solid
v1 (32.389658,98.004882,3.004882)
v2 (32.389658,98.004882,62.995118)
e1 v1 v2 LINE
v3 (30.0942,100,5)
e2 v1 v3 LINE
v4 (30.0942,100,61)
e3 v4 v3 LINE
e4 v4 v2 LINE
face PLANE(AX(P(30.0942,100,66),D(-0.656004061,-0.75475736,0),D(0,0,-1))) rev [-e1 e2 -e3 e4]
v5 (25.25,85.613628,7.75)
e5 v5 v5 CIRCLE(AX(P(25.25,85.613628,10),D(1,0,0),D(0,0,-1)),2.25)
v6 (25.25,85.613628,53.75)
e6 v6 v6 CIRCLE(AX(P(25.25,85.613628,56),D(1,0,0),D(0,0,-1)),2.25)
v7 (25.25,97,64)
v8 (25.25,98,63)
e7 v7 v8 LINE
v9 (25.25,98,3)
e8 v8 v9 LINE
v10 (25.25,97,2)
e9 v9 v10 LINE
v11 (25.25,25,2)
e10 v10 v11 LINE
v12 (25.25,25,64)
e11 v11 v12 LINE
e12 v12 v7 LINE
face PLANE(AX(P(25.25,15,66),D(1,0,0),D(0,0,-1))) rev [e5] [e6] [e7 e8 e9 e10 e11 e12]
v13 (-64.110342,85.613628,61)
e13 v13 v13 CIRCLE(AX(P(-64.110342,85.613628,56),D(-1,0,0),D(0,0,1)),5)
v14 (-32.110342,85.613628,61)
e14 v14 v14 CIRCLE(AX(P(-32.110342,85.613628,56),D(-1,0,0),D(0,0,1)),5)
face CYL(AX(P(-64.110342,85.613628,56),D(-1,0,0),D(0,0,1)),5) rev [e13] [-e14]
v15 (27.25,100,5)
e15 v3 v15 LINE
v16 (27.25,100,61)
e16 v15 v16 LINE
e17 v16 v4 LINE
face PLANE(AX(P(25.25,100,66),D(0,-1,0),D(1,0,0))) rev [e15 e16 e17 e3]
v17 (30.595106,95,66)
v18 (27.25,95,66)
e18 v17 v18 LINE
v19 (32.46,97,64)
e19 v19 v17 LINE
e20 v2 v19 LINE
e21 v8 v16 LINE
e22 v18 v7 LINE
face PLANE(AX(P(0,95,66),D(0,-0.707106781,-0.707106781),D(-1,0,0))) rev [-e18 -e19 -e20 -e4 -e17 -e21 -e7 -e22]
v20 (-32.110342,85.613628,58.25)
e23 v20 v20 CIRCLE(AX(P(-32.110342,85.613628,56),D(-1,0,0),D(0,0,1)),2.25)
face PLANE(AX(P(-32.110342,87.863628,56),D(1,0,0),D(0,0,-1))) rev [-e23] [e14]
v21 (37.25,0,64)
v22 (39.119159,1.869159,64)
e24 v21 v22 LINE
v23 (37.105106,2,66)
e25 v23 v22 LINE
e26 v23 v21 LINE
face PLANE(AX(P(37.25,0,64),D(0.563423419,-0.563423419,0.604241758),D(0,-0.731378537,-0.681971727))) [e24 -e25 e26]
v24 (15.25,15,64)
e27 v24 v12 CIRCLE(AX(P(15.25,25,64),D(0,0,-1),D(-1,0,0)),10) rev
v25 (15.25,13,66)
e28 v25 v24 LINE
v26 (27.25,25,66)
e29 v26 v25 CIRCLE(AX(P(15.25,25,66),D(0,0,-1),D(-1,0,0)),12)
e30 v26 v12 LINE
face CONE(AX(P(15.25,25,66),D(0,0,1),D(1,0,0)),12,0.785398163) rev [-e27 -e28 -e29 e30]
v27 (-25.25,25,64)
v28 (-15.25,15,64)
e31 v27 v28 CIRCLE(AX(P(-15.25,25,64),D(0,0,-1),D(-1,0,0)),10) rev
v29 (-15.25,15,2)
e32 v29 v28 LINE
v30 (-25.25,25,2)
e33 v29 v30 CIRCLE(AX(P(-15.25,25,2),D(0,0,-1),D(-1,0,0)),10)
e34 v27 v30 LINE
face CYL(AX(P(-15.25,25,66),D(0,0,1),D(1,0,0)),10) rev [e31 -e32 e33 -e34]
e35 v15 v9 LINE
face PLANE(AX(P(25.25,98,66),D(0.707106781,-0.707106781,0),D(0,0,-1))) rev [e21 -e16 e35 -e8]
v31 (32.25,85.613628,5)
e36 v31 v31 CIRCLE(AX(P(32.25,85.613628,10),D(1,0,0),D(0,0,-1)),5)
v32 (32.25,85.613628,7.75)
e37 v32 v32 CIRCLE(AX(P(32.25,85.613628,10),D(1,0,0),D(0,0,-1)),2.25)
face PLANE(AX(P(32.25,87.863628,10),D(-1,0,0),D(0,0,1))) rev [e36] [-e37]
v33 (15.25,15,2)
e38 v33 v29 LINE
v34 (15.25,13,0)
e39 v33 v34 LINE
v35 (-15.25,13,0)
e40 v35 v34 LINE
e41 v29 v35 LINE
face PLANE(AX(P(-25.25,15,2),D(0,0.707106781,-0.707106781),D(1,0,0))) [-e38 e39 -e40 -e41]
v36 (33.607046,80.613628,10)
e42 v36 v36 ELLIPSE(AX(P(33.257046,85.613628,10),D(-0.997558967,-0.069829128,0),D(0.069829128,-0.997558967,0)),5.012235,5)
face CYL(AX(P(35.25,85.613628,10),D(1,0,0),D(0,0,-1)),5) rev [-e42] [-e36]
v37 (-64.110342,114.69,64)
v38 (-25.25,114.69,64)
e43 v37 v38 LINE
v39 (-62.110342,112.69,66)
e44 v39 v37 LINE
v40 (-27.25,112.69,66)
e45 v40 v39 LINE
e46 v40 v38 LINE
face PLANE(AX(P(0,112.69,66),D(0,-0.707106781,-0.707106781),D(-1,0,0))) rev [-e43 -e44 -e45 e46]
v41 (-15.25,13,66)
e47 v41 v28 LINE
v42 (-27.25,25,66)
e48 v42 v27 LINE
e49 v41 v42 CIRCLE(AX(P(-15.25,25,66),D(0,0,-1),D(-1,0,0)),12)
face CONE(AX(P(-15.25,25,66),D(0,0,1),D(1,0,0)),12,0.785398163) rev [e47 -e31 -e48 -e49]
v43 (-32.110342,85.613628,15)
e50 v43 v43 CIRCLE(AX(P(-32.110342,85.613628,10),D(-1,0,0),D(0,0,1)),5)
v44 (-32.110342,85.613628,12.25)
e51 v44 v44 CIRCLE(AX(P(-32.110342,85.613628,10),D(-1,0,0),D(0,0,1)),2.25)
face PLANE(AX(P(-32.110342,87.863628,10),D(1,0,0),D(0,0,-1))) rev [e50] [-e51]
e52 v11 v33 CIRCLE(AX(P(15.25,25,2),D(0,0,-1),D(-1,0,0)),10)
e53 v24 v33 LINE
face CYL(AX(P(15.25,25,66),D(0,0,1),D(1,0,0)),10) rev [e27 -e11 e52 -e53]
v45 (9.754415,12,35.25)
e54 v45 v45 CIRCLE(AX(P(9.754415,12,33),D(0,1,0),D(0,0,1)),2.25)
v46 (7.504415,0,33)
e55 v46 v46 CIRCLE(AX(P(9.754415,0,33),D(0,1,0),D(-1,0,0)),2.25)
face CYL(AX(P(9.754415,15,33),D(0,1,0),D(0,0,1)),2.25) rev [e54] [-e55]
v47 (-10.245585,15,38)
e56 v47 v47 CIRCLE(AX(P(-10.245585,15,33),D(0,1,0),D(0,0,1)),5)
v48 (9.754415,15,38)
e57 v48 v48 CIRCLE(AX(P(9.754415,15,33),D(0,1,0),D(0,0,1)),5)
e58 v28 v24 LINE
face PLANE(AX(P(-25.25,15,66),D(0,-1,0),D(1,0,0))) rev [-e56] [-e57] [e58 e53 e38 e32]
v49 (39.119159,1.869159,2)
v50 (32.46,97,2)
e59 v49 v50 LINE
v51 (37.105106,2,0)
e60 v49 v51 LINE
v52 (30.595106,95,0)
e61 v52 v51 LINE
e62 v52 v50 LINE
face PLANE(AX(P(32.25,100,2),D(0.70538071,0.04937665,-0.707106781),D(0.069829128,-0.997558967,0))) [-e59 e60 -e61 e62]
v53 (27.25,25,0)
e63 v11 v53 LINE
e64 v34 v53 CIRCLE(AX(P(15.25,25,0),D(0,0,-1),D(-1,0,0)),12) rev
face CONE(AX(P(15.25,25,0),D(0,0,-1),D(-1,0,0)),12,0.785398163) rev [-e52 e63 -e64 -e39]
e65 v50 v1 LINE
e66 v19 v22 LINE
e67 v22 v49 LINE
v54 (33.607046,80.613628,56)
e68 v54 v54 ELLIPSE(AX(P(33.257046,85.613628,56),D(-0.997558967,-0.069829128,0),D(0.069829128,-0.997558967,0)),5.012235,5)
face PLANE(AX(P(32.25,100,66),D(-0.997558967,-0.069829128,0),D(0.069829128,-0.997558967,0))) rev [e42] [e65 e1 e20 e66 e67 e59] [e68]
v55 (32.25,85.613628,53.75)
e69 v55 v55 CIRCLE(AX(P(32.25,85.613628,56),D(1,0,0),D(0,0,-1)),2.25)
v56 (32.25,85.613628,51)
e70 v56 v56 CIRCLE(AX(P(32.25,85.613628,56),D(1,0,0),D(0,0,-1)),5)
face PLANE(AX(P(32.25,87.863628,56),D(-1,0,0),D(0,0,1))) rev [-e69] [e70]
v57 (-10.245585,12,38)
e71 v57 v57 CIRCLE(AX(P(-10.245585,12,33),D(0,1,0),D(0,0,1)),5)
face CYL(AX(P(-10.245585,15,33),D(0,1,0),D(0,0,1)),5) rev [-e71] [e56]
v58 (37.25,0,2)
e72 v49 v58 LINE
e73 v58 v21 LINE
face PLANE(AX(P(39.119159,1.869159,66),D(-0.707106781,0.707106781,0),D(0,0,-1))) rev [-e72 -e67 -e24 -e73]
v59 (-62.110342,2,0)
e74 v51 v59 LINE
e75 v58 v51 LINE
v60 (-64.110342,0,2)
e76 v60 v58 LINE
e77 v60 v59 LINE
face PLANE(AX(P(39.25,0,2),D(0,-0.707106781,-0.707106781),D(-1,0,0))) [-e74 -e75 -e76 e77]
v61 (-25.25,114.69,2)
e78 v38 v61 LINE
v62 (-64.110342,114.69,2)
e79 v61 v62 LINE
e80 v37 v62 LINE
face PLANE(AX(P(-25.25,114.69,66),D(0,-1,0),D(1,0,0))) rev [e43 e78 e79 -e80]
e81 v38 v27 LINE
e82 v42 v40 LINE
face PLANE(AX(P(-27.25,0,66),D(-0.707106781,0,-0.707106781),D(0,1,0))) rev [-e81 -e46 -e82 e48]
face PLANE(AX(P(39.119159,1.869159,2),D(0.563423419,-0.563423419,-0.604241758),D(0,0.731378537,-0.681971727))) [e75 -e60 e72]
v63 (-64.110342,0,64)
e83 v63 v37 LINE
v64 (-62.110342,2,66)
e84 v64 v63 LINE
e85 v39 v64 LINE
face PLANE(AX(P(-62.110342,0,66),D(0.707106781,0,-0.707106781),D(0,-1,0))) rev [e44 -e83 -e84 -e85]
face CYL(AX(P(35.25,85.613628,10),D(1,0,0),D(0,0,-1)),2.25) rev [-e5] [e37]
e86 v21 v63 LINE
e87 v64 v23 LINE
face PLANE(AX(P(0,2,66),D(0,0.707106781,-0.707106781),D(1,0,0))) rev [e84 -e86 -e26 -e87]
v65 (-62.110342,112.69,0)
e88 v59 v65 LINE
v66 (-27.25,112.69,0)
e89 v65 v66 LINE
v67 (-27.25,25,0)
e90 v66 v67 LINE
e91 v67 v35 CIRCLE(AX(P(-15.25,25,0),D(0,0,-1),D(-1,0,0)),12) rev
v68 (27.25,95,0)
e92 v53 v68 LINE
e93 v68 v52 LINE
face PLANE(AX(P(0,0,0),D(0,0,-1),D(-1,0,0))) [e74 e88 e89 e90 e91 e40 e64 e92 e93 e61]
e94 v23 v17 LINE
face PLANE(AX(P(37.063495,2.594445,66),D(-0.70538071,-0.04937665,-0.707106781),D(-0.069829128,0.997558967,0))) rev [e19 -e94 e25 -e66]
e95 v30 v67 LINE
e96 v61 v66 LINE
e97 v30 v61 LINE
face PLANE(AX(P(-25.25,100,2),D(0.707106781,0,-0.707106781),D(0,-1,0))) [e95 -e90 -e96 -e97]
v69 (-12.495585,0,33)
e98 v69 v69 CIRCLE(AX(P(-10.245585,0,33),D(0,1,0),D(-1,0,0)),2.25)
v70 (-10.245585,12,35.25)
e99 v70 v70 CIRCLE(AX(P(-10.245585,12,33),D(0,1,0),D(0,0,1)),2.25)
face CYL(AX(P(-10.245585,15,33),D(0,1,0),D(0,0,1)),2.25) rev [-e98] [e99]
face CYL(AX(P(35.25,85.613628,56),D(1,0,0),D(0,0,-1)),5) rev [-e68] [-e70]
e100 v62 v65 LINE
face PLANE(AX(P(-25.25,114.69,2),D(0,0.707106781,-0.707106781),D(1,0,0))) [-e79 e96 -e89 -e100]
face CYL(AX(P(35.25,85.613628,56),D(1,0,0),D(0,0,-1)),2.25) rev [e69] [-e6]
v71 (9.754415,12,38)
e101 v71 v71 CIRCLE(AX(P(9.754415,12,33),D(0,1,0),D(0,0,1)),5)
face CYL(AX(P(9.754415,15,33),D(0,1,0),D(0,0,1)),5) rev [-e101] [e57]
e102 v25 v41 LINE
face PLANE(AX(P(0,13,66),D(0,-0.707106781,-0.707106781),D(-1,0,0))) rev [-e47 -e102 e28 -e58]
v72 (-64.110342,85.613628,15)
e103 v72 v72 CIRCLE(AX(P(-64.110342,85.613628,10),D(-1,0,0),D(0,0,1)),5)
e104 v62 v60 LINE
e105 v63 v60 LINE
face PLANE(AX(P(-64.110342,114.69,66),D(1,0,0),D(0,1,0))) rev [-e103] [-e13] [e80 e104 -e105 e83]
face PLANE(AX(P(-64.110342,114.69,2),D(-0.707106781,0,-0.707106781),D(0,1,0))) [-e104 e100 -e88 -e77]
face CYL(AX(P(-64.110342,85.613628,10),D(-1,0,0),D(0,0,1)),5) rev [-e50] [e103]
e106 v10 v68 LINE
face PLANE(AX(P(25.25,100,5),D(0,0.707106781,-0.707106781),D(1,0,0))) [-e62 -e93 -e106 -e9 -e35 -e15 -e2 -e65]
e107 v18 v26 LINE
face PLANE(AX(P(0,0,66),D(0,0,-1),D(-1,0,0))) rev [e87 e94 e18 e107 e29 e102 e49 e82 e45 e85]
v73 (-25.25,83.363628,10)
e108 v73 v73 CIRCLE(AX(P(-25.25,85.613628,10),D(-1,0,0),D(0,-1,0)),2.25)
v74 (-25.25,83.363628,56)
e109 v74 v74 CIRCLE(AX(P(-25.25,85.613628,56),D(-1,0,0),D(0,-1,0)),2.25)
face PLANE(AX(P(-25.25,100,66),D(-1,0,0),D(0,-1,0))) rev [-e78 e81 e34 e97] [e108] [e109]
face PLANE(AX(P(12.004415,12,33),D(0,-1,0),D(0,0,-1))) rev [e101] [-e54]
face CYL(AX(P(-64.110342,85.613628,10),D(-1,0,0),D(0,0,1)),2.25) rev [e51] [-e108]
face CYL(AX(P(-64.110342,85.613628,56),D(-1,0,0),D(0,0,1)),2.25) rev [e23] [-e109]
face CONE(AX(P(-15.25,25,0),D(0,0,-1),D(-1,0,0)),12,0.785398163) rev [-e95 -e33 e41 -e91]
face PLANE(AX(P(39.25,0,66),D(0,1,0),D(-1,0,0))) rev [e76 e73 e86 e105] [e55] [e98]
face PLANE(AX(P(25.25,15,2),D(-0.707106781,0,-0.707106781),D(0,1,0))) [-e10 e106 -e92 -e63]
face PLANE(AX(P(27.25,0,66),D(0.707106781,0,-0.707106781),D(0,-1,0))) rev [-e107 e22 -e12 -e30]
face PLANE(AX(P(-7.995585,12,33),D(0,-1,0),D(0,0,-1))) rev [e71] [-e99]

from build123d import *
from OCP.BRepFilletAPI import BRepFilletAPI_MakeChamfer

# Parameters (mm, degrees)
ESTRUSIONE_ESTRUSIONE1_DEPTH                         = 66
RACCORDO1_R                                          = 10
SMUSSO1_SIZE                                         = 2
SMUSSO1_SIZE2                                        = 2.155800013
SMUSSO1_SIZE2_2                                      = 1.873732722
SMUSSO2_SIZE                                         = 5
FORO_LAMATO_PER_VITE_M4_A_TESTA_CILINDRI_D           = 4.5
FORO_LAMATO_PER_VITE_M4_A_TESTA_CILINDRI_DEPTH       = 30
FORO_LAMATO_PER_VITE_M4_A_TESTA_CILINDRI_CBORE_D     = 10
FORO_LAMATO_PER_VITE_M4_A_TESTA_CILINDRI_CBORE_DEPTH = 3
FORO_LAMATO_PER_VITE_M4_A_TESTA_CILINDRI_TIP         = 1.351936393
FORO_LAMATO_PER_VITE_M4_A_TESTA_CILI_2_D             = 4.5
FORO_LAMATO_PER_VITE_M4_A_TESTA_CILI_2_DEPTH         = 30
FORO_LAMATO_PER_VITE_M4_A_TESTA_CILI_2_CBORE_D       = 10
FORO_LAMATO_PER_VITE_M4_A_TESTA_CILI_2_CBORE_DEPTH   = 3
FORO_LAMATO_PER_VITE_M4_A_TESTA_CILI_2_TIP           = 1.351936393
FORO_LAMATO_PER_VITE_M4_A_TESTA_CILI_3_D             = 4.5
FORO_LAMATO_PER_VITE_M4_A_TESTA_CILI_3_DEPTH         = 45
FORO_LAMATO_PER_VITE_M4_A_TESTA_CILI_3_CBORE_D       = 10
FORO_LAMATO_PER_VITE_M4_A_TESTA_CILI_3_CBORE_DEPTH   = 32
FORO_LAMATO_PER_VITE_M4_A_TESTA_CILI_3_TIP           = 1.351936393


with BuildPart() as part:
    # Schizzo1 → Estrusione-Estrusione1 (new body)
    with BuildSketch(Plane.XY):
        Polygon((25.25, 100), (32.25, 100), (39.25, 0), (-39.25, 0), (-64.110342, 0), (-64.110342, 114.69), (-25.25, 114.69), (-25.25, 100), (-25.25, 15), (25.25, 15), align=None)
    extrude(amount=ESTRUSIONE_ESTRUSIONE1_DEPTH)

    # Raccordo1
    raccordo1_edges = [part.edges().sort_by_distance(p)[0] for p in [
        (-25.25, 15, 33),
        (25.25, 15, 33),
    ]]
    fillet(raccordo1_edges, radius=RACCORDO1_R)

    # Smusso1: one chamfer whose edges measure the first distance from different faces: ONE call of the kernel's chamfer builder (chamfer() names one face for all edges)
    smusso1_edges_1 = [part.edges().sort_by_distance(p)[0] for p in [
        (35.75, 50, 0),
        (-12.430171, 0, 0),
        (-64.110342, 57.345, 0),
        (-44.680171, 114.69, 0),
        (25.25, 62.5, 0),
        (25.25, 100, 33),
        (-44.680171, 114.69, 66),
        (-64.110342, 57.345, 66),
        (-12.430171, 0, 66),
        (-25.25, 69.845, 0),
        (-25.25, 69.845, 66),
        (0, 15, 0),
        (0, 15, 66),
        (-22.321067812, 17.928932188, 0),
        (-22.321067812, 17.928932188, 66),
        (35.75, 50, 66),
        (22.321067812, 17.928932188, 0),
        (22.321067812, 17.928932188, 66),
        (25.25, 62.5, 66),
    ]]
    smusso1_edges_2 = [part.edges().sort_by_distance(p)[0] for p in [
        (32.25, 100, 33),
    ]]
    smusso1_side_2 = [part.faces().sort_by_distance(p)[0] for p in [
        (35.75, 50, 33),
    ]]
    smusso1_edges_3 = [part.edges().sort_by_distance(p)[0] for p in [
        (39.25, 0, 33),
    ]]
    smusso1_side_3 = [part.faces().sort_by_distance(p)[0] for p in [
        (-12.430171, 0, 33),
    ]]
    smusso1 = BRepFilletAPI_MakeChamfer(part.part.solid().wrapped)
    for e in smusso1_edges_1:
        smusso1.Add(SMUSSO1_SIZE, e.wrapped)
    for e in smusso1_edges_2:
        smusso1.Add(SMUSSO1_SIZE, SMUSSO1_SIZE2, e.wrapped, smusso1_side_2[0].wrapped)  # the first distance lies on this face
    for e in smusso1_edges_3:
        smusso1.Add(SMUSSO1_SIZE, SMUSSO1_SIZE2_2, e.wrapped, smusso1_side_3[0].wrapped)  # the first distance lies on this face
    add(Compound.cast(smusso1.Shape()), mode=Mode.REPLACE)

    # Smusso2
    # the kernel refuses this chamfer: 5 mm, written as the material it takes off along each edge
    with BuildSketch(Plane(origin=(14.39158506, 100, 66), x_dir=(2.02935454733688e-15, -0.9996219169112968, 0.027495876610587663), z_dir=(1, 0, 0)), Plane(origin=(14.39158506, 100, 0), x_dir=(0, 0.0274958766105877, 0.9996219169112968), z_dir=(1, 0, 0))) as smusso2_piece_1:
        Polygon((SMUSSO2_SIZE * 0.999621916911, SMUSSO2_SIZE * 0.0274958766106), (-SMUSSO2_SIZE * 0.0274958766106, SMUSSO2_SIZE * 0.999621916911), (0, 0), align=None)
    extrude(amount=28.561029867, mode=Mode.SUBTRACT)

    # Foro lamato per Vite M4 a testa cilindri
    with Locations(Plane(origin=(35.25, 0, 0), x_dir=(0, 0, 1), z_dir=(1, 0, 0))):
        with Locations((56, -85.613628), (10, -85.613628)):
            CounterBoreHole(FORO_LAMATO_PER_VITE_M4_A_TESTA_CILINDRI_D / 2, FORO_LAMATO_PER_VITE_M4_A_TESTA_CILINDRI_CBORE_D / 2, FORO_LAMATO_PER_VITE_M4_A_TESTA_CILINDRI_CBORE_DEPTH, depth=FORO_LAMATO_PER_VITE_M4_A_TESTA_CILINDRI_DEPTH)
            with Locations((0, 0, -(FORO_LAMATO_PER_VITE_M4_A_TESTA_CILINDRI_DEPTH + FORO_LAMATO_PER_VITE_M4_A_TESTA_CILINDRI_TIP / 2))):  # 118° drill point
                Cone(0, FORO_LAMATO_PER_VITE_M4_A_TESTA_CILINDRI_D / 2, FORO_LAMATO_PER_VITE_M4_A_TESTA_CILINDRI_TIP, mode=Mode.SUBTRACT)

    # Foro lamato per Vite M4 a testa cili 2
    with Locations(Plane(origin=(0, 15, 0), x_dir=(1, 0, 0), z_dir=(0, 1, 0))):
        with Locations((-10.245584981, -33), (9.754415019, -33)):
            CounterBoreHole(FORO_LAMATO_PER_VITE_M4_A_TESTA_CILI_2_D / 2, FORO_LAMATO_PER_VITE_M4_A_TESTA_CILI_2_CBORE_D / 2, FORO_LAMATO_PER_VITE_M4_A_TESTA_CILI_2_CBORE_DEPTH, depth=FORO_LAMATO_PER_VITE_M4_A_TESTA_CILI_2_DEPTH)
            with Locations((0, 0, -(FORO_LAMATO_PER_VITE_M4_A_TESTA_CILI_2_DEPTH + FORO_LAMATO_PER_VITE_M4_A_TESTA_CILI_2_TIP / 2))):  # 118° drill point
                Cone(0, FORO_LAMATO_PER_VITE_M4_A_TESTA_CILI_2_D / 2, FORO_LAMATO_PER_VITE_M4_A_TESTA_CILI_2_TIP, mode=Mode.SUBTRACT)

    # Foro lamato per Vite M4 a testa cili 3
    with Locations(Plane.ZY.offset(64.110342)):
        with Locations((10, 85.613628), (56, 85.613628)):
            CounterBoreHole(FORO_LAMATO_PER_VITE_M4_A_TESTA_CILI_3_D / 2, FORO_LAMATO_PER_VITE_M4_A_TESTA_CILI_3_CBORE_D / 2, FORO_LAMATO_PER_VITE_M4_A_TESTA_CILI_3_CBORE_DEPTH, depth=FORO_LAMATO_PER_VITE_M4_A_TESTA_CILI_3_DEPTH)
            with Locations((0, 0, -(FORO_LAMATO_PER_VITE_M4_A_TESTA_CILI_3_DEPTH + FORO_LAMATO_PER_VITE_M4_A_TESTA_CILI_3_TIP / 2))):  # 118° drill point
                Cone(0, FORO_LAMATO_PER_VITE_M4_A_TESTA_CILI_3_D / 2, FORO_LAMATO_PER_VITE_M4_A_TESTA_CILI_3_TIP, mode=Mode.SUBTRACT)


solid = part.part
